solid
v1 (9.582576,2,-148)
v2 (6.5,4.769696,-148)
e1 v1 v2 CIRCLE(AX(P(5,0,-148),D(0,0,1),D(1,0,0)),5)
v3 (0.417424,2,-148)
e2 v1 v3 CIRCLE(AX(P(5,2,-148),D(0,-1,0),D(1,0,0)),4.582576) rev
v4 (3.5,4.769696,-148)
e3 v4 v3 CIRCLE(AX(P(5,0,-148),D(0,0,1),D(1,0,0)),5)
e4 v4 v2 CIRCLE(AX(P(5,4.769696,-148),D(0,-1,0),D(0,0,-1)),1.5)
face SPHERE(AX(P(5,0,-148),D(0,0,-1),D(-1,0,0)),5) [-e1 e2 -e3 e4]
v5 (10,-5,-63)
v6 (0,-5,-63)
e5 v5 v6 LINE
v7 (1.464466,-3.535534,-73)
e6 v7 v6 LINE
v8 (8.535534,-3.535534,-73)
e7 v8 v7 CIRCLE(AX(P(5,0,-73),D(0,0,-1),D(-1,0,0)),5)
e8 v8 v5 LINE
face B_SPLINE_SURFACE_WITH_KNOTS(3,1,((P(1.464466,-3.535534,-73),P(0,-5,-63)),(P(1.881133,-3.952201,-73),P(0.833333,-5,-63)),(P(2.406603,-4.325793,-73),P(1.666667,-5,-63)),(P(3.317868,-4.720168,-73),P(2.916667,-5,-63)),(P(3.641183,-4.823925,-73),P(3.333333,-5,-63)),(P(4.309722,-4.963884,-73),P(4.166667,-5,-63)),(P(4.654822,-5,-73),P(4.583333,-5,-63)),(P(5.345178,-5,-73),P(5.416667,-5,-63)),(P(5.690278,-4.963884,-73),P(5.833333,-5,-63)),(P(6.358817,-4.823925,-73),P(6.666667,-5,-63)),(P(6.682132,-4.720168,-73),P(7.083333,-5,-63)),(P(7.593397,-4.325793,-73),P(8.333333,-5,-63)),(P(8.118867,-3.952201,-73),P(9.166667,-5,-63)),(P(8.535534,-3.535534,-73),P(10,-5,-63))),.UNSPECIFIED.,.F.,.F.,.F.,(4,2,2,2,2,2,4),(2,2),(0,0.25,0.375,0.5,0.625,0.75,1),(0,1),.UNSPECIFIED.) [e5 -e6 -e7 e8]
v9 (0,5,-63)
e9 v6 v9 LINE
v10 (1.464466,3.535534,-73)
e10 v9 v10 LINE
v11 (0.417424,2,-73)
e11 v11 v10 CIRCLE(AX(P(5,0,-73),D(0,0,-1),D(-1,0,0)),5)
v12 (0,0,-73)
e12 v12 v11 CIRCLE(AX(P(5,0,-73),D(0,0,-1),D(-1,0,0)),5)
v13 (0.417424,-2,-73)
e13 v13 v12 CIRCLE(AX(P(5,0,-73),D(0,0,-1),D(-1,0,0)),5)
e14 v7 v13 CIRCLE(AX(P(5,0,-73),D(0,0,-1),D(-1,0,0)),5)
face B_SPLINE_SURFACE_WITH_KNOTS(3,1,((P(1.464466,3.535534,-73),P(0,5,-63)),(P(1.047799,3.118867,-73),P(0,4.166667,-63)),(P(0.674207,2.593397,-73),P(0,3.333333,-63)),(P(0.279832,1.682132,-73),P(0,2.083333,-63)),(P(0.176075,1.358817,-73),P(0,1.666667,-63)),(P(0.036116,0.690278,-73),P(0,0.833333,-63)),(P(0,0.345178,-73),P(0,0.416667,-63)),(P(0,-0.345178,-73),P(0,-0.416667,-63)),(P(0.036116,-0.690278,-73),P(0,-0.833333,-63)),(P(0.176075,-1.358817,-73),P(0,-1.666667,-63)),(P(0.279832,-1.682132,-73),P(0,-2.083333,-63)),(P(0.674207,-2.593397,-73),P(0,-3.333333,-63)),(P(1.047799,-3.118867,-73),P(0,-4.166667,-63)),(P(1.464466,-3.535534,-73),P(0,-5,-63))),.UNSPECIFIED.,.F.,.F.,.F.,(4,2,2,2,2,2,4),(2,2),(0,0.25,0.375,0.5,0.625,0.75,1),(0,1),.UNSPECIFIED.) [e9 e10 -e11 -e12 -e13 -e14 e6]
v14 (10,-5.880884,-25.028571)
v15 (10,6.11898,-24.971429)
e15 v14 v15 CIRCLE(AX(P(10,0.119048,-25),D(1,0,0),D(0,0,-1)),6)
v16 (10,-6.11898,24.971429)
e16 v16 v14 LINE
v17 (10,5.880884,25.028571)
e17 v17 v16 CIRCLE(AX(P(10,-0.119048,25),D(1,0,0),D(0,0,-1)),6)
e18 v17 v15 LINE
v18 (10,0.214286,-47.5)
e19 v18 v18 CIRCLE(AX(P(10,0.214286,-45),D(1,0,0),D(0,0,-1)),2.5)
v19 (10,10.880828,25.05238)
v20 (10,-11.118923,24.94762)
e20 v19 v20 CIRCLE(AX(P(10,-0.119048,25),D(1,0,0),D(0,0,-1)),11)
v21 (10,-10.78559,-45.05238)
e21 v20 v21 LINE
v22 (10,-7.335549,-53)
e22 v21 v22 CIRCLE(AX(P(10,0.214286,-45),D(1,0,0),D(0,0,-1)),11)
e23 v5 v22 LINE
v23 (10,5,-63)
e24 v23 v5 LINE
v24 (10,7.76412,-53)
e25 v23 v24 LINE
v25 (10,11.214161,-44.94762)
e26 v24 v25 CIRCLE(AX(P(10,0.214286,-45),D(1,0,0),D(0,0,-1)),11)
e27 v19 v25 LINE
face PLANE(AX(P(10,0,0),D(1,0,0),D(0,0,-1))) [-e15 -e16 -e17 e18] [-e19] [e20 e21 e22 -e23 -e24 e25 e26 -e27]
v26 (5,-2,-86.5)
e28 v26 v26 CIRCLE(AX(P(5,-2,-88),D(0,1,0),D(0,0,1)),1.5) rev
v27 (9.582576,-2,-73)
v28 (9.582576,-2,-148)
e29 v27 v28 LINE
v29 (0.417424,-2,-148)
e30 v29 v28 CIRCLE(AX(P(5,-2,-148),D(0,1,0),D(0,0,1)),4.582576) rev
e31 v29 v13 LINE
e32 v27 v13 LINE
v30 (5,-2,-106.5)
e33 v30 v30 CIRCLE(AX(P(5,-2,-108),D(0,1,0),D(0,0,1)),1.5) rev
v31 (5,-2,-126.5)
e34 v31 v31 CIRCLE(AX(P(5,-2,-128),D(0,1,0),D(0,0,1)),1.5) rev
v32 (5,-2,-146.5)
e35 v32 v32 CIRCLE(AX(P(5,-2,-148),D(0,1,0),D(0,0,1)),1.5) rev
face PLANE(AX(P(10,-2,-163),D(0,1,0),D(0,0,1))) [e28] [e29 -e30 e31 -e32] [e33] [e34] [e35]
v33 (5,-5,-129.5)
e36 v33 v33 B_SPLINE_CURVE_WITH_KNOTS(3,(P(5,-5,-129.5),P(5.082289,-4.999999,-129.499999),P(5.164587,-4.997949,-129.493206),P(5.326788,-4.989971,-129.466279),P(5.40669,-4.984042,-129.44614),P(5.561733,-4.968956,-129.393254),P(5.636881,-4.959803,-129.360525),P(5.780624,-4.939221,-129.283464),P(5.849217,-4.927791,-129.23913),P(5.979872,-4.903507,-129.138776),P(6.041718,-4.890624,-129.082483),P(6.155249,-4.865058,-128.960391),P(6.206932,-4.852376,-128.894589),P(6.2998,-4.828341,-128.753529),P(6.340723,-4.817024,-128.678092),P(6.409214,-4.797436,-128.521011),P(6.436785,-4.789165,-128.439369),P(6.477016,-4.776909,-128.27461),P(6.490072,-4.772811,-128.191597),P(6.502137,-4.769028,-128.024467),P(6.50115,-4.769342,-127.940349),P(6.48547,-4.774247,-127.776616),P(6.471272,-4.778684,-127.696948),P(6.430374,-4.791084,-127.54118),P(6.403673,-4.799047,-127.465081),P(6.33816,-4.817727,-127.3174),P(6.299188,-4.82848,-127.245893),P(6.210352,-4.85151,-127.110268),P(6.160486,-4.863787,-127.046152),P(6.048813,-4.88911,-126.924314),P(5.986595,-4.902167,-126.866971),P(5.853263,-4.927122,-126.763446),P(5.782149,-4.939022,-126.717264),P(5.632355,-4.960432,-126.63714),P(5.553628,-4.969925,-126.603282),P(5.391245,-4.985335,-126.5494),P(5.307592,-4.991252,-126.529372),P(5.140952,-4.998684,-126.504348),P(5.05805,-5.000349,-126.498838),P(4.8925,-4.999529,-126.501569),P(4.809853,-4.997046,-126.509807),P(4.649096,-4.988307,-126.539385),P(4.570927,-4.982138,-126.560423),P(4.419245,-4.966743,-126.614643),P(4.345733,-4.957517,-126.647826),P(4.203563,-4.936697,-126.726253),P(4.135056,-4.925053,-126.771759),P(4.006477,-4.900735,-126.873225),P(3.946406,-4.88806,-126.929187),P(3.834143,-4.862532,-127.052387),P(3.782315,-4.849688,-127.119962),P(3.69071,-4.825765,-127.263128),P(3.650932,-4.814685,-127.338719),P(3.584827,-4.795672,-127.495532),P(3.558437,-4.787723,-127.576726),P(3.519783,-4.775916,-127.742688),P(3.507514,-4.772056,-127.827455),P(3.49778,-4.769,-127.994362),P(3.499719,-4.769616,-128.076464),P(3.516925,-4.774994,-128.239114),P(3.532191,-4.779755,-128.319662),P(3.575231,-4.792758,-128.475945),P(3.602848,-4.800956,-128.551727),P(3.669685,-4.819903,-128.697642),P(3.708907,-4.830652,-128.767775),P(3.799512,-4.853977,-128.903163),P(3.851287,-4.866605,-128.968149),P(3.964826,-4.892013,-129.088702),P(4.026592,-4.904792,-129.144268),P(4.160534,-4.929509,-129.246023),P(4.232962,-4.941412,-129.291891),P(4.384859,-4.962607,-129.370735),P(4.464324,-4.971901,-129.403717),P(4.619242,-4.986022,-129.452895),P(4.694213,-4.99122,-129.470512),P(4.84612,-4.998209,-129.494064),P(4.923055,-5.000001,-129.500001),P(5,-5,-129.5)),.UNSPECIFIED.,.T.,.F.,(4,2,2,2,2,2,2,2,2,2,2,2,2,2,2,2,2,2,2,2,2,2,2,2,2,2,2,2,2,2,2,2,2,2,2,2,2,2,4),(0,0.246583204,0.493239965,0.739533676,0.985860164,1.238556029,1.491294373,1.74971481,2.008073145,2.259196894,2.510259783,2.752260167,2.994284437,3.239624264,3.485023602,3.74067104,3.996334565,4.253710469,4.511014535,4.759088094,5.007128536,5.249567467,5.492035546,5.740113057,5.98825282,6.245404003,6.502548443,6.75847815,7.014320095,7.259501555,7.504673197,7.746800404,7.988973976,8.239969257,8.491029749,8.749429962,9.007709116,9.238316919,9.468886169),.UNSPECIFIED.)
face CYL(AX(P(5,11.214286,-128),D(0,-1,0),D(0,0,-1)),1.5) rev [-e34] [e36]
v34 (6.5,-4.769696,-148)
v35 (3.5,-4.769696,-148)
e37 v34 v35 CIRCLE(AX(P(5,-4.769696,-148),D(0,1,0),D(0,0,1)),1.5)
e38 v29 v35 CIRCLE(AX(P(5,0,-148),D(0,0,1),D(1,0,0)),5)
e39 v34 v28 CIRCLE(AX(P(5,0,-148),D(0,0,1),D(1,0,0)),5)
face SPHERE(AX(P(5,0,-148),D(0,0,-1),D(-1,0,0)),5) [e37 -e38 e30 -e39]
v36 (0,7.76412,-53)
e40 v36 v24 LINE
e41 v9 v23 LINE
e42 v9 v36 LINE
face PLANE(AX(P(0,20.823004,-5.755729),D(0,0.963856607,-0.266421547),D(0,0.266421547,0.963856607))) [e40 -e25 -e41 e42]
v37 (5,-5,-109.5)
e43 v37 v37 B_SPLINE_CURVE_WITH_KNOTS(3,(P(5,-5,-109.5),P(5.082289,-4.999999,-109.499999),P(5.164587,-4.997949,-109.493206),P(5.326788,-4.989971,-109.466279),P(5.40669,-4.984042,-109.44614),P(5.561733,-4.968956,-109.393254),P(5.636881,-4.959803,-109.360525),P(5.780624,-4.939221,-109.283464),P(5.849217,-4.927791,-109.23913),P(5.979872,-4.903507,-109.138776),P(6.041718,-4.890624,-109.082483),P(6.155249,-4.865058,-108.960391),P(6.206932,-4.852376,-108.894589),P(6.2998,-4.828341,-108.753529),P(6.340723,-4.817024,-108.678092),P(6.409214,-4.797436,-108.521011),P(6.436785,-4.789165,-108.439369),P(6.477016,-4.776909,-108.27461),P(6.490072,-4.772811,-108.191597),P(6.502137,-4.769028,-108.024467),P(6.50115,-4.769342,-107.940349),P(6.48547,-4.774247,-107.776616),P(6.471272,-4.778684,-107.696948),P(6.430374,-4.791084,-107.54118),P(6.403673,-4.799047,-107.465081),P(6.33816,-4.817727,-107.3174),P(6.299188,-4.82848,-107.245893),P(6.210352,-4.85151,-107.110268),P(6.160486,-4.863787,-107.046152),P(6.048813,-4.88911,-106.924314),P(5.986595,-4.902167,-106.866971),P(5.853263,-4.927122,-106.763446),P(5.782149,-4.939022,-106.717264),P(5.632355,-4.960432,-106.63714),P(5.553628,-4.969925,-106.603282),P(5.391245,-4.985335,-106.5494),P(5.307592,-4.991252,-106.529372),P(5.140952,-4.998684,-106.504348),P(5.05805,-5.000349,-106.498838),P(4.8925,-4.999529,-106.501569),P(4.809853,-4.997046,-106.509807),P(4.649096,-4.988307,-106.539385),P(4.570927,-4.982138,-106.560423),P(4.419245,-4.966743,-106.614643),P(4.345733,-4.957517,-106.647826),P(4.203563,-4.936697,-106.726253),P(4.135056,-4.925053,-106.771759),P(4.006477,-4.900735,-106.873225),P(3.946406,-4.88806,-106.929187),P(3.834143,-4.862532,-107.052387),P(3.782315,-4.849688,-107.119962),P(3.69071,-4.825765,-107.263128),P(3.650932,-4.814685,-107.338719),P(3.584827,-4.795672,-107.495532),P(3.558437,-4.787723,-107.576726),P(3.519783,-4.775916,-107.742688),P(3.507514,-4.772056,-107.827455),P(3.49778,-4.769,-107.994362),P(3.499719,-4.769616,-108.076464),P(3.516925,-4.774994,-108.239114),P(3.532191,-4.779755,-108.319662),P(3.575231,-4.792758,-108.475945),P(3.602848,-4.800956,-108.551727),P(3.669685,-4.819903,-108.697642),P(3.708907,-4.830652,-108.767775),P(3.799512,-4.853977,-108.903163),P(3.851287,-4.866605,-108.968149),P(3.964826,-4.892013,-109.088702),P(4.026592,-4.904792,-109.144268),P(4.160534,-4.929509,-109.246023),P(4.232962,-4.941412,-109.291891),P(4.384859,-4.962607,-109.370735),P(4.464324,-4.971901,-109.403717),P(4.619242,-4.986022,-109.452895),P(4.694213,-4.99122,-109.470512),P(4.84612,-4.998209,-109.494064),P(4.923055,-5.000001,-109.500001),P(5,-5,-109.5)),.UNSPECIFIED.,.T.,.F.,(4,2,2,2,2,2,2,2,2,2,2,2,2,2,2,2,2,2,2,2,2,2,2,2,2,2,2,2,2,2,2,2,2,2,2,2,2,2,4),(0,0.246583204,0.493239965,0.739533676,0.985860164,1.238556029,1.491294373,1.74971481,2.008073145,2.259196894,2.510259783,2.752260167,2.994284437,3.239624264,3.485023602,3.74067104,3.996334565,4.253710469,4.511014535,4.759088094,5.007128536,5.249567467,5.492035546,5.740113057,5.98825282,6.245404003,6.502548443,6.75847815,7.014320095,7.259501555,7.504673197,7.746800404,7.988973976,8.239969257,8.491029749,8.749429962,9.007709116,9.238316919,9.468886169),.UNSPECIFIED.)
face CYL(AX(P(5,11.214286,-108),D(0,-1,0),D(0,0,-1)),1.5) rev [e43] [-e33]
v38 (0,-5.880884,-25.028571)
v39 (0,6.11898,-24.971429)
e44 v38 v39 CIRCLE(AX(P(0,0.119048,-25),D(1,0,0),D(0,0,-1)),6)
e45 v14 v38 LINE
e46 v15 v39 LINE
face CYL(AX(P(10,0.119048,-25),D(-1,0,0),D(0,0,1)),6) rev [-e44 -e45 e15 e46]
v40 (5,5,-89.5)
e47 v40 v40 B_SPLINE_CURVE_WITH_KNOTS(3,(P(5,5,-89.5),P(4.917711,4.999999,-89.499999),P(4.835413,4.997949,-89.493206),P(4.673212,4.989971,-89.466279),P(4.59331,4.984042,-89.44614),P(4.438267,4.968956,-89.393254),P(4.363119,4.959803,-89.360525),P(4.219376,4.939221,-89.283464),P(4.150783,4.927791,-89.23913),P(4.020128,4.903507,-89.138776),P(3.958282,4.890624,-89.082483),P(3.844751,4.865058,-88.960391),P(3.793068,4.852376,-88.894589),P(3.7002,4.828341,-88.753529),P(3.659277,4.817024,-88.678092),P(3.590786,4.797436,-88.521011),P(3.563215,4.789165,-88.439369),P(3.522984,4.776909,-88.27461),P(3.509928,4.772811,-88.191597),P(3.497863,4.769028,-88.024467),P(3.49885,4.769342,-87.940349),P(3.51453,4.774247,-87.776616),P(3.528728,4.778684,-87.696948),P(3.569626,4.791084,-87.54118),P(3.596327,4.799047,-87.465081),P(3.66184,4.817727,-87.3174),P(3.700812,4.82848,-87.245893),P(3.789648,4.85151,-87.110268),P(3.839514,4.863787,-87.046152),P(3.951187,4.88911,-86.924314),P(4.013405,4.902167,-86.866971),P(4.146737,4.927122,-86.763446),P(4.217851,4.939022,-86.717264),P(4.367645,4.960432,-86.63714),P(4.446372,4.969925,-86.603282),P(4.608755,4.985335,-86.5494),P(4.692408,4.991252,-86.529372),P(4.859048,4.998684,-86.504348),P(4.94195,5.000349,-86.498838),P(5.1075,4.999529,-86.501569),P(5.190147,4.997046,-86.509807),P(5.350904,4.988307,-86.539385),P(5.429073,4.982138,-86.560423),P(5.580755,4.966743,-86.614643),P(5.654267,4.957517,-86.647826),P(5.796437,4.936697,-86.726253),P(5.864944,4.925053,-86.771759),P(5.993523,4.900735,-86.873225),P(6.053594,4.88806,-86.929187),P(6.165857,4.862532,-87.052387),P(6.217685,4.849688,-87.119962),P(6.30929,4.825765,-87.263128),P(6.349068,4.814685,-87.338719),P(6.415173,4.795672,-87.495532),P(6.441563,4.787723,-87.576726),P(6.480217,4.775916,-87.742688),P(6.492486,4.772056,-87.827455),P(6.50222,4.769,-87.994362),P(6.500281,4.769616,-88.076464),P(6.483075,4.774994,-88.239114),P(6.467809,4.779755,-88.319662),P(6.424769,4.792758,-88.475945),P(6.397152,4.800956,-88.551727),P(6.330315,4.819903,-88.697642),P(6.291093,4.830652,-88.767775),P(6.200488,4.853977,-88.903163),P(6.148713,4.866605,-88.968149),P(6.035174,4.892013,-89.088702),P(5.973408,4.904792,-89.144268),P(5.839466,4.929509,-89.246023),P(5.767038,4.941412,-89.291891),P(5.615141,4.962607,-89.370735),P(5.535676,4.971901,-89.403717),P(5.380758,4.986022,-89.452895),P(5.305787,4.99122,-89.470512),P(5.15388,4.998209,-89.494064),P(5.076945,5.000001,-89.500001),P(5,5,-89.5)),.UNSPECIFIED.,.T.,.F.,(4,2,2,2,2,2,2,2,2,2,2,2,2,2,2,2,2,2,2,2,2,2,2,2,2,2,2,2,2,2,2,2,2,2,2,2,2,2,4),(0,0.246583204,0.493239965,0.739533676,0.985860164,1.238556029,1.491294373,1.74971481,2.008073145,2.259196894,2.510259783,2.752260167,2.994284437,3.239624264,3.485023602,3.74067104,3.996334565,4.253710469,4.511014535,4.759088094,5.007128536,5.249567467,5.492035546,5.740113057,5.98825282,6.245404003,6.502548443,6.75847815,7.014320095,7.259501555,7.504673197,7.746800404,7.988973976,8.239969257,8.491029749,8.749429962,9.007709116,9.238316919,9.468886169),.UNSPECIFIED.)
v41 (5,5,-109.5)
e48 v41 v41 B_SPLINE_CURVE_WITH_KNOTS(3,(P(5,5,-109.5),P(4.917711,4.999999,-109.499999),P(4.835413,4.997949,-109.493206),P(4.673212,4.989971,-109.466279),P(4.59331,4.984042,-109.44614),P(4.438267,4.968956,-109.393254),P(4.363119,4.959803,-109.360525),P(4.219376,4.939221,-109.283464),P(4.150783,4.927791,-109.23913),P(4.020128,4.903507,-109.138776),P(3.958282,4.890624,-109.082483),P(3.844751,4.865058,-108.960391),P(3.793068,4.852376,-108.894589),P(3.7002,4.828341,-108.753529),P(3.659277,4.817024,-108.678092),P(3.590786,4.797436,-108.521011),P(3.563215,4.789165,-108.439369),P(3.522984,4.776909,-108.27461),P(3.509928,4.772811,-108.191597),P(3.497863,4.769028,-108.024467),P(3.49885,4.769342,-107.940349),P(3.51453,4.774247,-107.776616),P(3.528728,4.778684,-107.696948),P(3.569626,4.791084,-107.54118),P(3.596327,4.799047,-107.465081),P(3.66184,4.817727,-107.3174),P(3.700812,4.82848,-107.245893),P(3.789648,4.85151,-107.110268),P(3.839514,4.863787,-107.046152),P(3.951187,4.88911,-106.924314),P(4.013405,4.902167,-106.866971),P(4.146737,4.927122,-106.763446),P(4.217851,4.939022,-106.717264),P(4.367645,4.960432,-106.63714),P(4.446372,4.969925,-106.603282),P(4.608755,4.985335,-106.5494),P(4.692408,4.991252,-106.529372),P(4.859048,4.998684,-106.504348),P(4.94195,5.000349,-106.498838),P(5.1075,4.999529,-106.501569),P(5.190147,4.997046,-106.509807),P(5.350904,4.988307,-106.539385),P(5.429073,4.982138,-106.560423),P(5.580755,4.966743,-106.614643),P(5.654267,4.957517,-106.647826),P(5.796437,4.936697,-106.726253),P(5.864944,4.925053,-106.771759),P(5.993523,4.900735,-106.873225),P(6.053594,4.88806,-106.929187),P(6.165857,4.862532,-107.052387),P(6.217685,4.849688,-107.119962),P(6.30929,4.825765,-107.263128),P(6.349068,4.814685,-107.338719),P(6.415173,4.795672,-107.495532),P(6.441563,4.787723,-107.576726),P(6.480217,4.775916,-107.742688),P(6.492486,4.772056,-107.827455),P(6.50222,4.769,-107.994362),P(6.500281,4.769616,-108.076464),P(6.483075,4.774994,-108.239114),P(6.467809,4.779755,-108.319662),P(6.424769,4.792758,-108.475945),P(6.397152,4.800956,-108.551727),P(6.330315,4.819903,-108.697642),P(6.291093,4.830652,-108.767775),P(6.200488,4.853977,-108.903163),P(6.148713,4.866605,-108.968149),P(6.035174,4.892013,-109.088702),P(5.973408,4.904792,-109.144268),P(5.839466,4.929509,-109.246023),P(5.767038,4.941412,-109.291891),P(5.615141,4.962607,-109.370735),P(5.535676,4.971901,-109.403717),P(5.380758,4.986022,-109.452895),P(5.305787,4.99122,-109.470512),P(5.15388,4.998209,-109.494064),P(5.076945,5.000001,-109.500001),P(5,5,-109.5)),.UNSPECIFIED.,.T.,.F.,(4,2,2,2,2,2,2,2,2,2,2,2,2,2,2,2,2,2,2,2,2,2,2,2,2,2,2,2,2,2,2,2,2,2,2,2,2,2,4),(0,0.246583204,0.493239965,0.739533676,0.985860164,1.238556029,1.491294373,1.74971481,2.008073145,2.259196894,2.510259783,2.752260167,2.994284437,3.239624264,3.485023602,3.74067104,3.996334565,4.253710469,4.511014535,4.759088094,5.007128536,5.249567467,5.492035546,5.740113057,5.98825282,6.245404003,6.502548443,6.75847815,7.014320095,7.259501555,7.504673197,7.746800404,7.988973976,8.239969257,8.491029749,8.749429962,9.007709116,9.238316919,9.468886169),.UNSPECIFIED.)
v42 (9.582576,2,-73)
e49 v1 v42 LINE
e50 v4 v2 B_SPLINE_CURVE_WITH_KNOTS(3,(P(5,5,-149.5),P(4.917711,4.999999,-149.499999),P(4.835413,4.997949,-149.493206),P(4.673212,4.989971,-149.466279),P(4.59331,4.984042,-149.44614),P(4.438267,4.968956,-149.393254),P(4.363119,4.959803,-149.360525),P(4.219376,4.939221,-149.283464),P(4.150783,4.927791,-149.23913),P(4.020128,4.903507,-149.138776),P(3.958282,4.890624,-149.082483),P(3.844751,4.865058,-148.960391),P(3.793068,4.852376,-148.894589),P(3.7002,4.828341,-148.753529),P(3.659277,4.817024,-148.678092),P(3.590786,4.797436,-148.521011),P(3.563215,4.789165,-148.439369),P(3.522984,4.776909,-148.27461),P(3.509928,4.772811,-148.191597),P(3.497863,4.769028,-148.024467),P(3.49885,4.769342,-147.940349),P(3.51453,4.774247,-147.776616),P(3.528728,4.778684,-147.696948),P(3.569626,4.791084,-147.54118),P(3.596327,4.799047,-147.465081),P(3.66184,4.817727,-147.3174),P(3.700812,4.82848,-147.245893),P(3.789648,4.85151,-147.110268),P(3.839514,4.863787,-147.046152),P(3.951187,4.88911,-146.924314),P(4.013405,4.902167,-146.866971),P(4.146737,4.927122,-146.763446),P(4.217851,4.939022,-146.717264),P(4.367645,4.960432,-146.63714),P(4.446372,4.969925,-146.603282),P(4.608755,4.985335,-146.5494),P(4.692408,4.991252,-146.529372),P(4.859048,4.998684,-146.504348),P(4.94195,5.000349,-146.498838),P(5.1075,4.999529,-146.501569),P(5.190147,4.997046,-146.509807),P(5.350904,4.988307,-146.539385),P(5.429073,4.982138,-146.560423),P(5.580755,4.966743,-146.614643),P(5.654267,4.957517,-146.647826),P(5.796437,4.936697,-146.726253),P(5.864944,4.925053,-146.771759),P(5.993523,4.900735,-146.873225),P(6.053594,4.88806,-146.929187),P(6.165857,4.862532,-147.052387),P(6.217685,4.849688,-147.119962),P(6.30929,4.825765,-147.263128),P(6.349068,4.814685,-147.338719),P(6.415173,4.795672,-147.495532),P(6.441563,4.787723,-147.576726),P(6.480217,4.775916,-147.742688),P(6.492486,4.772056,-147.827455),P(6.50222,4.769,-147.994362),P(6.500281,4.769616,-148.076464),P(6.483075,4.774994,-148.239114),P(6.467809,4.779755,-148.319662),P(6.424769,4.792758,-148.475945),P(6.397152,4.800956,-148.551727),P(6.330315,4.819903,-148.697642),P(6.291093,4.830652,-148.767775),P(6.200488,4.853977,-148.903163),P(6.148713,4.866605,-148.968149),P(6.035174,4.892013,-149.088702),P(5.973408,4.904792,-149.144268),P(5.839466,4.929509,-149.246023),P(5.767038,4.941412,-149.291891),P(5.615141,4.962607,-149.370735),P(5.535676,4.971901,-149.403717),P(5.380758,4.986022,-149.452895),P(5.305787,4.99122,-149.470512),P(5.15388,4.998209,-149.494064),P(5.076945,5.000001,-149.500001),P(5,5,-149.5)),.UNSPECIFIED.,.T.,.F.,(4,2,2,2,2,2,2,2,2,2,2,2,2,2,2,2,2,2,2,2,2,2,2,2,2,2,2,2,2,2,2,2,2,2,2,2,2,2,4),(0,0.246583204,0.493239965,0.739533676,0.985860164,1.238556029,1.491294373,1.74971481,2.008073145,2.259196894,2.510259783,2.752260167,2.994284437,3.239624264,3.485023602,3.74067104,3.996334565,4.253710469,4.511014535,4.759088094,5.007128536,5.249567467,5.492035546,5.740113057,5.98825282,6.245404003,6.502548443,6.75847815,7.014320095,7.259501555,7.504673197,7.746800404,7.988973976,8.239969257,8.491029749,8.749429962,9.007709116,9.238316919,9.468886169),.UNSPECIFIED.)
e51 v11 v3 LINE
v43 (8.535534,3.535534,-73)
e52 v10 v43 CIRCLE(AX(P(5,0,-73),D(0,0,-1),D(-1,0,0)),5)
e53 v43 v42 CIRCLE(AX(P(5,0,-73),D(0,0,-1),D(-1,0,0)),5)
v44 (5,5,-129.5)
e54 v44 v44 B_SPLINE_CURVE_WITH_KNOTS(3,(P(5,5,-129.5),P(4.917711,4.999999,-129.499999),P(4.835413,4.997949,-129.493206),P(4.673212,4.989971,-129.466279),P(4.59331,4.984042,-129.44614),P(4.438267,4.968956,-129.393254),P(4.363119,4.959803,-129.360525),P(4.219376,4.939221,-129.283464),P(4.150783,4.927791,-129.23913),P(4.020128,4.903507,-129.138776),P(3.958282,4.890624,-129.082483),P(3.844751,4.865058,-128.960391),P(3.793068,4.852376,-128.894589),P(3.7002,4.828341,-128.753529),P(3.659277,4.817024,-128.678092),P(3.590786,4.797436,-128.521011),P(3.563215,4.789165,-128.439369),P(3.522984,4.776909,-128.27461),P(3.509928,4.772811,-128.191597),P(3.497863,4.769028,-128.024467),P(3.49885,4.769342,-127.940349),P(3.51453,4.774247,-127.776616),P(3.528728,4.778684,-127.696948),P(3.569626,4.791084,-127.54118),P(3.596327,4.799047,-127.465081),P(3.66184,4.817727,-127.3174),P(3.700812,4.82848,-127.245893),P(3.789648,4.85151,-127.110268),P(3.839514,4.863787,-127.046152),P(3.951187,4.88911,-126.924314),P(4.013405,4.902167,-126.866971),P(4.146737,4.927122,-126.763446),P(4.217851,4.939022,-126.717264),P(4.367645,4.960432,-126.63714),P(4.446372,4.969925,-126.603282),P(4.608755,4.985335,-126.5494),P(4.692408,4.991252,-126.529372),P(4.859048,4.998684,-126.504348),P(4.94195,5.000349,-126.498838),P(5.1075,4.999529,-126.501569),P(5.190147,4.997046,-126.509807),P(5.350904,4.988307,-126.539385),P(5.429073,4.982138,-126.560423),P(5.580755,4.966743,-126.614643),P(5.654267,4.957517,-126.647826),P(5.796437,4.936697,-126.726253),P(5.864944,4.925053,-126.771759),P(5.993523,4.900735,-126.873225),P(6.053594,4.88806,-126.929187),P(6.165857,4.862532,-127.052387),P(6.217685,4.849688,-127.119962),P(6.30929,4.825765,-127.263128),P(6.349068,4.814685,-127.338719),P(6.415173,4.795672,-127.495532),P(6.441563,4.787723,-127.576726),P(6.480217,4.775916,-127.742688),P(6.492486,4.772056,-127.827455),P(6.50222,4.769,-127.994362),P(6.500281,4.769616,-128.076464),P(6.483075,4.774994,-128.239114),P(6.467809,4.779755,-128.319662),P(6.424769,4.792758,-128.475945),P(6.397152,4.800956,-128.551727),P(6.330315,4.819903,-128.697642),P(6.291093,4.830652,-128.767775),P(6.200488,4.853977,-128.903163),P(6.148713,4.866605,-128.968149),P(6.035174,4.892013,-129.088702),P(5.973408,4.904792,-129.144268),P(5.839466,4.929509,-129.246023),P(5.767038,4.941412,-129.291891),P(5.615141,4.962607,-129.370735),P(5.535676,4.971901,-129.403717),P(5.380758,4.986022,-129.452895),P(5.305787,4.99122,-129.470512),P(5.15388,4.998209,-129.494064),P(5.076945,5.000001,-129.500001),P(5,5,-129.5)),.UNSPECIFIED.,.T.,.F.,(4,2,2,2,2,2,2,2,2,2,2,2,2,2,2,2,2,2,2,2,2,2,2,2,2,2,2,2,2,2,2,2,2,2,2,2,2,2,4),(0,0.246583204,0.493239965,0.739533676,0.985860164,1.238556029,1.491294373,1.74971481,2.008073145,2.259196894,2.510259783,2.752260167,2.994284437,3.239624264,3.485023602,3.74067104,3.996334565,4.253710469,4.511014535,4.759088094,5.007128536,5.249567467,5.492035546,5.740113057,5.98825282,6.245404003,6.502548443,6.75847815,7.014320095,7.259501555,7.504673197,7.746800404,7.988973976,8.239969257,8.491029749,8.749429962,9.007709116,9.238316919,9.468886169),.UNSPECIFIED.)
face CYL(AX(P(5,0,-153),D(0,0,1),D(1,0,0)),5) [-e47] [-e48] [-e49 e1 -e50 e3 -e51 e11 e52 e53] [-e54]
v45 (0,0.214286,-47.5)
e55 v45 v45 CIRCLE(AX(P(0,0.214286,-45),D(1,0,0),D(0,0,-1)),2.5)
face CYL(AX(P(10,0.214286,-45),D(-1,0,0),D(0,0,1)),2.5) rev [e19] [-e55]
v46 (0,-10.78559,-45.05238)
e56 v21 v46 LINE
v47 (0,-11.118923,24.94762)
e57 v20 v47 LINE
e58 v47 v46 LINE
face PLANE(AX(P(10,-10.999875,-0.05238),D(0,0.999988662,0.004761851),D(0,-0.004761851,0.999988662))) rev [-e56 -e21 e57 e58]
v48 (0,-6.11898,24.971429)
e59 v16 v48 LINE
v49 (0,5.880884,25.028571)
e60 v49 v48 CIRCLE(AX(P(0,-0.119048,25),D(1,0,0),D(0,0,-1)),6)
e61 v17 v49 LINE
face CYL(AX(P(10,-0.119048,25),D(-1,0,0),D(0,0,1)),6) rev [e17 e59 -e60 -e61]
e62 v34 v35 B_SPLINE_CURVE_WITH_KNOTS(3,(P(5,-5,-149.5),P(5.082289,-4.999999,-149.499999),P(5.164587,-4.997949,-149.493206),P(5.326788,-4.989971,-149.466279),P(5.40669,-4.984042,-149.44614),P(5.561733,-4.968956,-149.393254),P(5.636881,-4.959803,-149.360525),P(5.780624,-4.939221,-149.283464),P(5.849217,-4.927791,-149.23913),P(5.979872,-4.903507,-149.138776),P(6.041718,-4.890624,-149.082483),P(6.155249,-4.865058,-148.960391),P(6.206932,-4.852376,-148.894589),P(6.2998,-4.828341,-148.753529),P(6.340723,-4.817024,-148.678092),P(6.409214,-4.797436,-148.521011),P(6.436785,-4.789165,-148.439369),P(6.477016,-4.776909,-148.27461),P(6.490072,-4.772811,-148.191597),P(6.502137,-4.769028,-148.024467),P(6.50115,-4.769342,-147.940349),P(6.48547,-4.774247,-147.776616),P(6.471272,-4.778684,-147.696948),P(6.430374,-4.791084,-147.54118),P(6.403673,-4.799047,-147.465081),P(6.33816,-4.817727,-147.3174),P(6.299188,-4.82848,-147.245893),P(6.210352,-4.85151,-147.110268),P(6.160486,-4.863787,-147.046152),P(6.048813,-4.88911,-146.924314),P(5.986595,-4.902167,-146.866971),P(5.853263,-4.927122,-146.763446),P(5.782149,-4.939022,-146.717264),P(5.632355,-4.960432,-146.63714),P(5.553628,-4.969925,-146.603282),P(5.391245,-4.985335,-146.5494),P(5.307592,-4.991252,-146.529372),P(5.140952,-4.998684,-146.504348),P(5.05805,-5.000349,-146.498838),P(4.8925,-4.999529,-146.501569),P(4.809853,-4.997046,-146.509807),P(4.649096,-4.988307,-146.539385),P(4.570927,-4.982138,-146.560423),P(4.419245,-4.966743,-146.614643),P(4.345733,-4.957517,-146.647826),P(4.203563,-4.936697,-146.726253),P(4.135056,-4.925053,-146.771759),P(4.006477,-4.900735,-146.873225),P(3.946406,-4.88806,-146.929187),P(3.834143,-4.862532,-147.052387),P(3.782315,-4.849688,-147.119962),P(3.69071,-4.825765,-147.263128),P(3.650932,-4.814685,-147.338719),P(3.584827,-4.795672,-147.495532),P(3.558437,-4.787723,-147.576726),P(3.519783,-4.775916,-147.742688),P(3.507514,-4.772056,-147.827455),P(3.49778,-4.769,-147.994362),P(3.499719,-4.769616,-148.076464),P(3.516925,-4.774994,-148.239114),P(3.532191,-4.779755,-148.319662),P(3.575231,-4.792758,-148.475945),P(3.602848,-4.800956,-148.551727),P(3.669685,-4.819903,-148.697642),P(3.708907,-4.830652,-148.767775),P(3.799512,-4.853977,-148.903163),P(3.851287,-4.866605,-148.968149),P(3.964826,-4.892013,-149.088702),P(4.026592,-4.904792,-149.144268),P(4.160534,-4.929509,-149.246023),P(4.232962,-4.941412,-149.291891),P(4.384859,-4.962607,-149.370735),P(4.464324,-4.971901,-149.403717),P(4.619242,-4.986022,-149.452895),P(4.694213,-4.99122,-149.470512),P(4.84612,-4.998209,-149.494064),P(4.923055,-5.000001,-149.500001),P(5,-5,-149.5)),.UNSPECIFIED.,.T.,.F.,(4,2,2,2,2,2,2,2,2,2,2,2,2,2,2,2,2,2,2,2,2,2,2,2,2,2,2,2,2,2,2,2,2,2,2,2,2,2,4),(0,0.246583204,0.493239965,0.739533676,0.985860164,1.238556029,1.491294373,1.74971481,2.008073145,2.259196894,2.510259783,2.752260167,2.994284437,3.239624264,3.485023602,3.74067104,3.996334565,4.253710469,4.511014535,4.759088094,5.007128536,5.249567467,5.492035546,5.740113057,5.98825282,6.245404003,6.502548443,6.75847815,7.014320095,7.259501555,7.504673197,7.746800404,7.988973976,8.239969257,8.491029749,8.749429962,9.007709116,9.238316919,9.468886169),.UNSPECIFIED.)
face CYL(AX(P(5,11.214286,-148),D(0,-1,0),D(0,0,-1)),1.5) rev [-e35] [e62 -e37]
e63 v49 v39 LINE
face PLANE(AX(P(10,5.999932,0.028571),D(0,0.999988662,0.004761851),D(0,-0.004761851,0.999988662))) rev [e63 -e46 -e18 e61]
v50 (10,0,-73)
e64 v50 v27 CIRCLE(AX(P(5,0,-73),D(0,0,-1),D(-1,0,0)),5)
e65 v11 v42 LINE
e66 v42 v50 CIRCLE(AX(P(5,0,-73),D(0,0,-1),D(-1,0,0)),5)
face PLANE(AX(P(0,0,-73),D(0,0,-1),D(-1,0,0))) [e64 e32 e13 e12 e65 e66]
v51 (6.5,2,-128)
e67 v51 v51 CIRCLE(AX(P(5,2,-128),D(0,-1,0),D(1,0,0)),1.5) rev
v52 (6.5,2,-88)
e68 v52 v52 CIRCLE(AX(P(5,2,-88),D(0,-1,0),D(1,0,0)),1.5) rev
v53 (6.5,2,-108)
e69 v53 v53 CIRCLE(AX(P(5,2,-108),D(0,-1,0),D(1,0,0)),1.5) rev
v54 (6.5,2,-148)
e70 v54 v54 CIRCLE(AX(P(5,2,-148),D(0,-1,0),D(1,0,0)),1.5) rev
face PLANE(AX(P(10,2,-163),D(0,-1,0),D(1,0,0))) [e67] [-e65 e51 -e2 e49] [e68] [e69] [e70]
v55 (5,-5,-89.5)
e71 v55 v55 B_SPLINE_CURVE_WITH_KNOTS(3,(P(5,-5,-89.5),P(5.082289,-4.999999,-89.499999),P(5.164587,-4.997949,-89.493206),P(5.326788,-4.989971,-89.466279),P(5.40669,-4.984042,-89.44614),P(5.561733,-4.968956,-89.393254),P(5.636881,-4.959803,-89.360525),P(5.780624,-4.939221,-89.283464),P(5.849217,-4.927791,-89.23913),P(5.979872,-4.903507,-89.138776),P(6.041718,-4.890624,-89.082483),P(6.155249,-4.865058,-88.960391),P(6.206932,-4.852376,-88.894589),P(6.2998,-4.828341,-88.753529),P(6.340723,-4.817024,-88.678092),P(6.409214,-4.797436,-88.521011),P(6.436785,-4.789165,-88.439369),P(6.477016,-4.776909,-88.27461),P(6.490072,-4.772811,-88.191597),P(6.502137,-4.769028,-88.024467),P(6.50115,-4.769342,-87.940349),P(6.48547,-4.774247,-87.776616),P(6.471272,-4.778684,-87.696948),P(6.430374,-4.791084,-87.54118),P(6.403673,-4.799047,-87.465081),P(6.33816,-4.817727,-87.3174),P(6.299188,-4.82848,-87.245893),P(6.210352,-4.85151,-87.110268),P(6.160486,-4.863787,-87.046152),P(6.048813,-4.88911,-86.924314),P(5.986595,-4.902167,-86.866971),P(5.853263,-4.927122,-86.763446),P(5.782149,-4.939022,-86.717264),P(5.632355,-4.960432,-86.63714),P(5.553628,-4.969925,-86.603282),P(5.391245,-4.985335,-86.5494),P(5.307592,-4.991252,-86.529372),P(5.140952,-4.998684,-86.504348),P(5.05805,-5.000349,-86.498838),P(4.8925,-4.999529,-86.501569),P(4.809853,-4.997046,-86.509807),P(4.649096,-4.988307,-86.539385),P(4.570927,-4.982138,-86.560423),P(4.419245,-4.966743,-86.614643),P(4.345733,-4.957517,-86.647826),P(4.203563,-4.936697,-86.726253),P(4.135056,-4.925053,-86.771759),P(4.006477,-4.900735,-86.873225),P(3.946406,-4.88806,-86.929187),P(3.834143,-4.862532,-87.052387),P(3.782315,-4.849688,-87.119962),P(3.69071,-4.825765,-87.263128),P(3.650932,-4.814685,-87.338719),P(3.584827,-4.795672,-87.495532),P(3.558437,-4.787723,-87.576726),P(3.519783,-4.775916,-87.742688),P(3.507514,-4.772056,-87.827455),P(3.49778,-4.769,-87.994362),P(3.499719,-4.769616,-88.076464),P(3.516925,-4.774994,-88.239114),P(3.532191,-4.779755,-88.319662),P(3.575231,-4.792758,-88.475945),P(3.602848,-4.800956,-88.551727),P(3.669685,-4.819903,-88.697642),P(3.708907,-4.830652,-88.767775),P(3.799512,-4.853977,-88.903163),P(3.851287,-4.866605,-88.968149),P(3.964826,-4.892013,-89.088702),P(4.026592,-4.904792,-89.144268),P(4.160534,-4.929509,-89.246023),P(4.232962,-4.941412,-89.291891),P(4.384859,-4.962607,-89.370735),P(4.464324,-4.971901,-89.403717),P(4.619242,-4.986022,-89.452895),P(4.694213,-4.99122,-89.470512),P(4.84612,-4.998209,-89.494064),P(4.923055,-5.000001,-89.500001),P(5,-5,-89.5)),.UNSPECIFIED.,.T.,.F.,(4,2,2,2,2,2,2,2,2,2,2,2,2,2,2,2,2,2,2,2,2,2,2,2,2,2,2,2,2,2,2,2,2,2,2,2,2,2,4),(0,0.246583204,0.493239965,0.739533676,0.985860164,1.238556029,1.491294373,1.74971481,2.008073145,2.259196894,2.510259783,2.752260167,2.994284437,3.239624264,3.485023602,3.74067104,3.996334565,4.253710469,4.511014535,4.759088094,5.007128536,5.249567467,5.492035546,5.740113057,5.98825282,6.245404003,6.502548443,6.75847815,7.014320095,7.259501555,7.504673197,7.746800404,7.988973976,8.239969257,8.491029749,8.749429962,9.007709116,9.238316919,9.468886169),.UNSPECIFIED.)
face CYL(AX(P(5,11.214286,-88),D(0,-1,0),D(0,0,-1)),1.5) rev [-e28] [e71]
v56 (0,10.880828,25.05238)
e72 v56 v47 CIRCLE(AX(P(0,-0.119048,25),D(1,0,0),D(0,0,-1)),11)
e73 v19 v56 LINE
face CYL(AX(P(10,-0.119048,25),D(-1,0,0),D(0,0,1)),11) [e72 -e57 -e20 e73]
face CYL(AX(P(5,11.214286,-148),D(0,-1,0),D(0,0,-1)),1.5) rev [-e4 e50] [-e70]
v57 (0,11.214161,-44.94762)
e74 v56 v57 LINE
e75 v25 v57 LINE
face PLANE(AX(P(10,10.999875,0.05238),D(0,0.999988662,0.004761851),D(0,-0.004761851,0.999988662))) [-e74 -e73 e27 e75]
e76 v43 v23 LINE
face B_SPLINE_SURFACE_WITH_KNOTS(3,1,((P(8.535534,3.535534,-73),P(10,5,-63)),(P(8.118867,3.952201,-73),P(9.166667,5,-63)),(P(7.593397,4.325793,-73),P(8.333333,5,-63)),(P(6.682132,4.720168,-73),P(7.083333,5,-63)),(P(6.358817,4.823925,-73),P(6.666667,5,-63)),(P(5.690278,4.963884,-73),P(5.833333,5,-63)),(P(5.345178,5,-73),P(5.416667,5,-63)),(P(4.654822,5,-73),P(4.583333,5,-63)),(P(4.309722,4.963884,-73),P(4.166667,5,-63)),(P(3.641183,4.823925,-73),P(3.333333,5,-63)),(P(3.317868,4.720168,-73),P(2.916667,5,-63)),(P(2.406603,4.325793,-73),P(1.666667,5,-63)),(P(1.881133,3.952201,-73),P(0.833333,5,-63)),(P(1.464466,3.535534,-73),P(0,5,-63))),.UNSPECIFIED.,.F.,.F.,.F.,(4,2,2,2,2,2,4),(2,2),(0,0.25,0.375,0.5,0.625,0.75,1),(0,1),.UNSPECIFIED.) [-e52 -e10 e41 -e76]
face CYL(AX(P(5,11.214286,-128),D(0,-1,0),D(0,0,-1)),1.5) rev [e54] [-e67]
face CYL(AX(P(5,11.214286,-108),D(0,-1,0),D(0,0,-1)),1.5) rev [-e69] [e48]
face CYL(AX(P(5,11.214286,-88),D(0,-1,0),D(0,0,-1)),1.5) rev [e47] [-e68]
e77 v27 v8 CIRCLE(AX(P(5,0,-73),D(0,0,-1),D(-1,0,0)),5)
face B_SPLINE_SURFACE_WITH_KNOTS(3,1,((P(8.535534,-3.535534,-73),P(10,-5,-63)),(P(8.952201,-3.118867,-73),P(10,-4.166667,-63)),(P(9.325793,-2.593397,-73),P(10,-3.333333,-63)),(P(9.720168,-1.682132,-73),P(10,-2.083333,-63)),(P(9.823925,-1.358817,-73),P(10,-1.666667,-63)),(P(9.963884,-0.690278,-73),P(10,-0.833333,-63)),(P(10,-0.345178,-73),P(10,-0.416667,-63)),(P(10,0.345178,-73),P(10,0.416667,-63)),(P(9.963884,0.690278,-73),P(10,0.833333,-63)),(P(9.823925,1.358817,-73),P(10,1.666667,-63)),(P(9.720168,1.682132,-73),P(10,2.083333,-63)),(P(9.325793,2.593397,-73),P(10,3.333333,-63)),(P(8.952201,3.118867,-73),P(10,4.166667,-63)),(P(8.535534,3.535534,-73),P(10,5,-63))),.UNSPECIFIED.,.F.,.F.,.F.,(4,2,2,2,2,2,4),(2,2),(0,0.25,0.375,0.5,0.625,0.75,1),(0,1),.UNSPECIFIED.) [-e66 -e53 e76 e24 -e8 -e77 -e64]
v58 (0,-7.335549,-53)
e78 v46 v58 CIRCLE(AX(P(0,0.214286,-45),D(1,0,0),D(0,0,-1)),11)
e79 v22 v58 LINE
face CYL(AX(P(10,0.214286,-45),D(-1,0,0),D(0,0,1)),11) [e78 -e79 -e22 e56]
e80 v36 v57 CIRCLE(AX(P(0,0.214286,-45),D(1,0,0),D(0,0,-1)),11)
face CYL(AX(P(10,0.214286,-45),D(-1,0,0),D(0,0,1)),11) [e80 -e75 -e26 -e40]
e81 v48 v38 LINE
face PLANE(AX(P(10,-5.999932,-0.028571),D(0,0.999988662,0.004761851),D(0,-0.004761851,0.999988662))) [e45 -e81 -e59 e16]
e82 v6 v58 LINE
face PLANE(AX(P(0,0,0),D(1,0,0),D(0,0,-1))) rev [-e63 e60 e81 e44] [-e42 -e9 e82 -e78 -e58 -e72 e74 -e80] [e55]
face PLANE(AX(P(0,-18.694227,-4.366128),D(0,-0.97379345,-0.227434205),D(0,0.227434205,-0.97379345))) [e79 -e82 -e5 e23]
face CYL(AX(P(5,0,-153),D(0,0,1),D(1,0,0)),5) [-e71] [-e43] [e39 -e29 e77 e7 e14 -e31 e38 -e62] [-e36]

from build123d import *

# Parameters (mm, degrees)
SKETCH1_R               = 2.4999999999999947
BOSS_EXTRUDE1_DEPTH     = 10
CUT_EXTRUDE2_DEPTH      = 37.99999999999999
SKETCH8_R               = 4.999999999999999
BOSS_EXTRUDE2_DEPTH     = 79.99999999999999
FILLET1_R               = 5
CUT_EXTRUDE3_DEPTH      = 89.99999999999999
CUT_EXTRUDE4_DEPTH      = 154.3205877044287
CUT_EXTRUDE4_DEPTH_BACK = 154.3205877044287
SKETCH10_R              = 1.5
SKETCH10_R_2            = 1.5000000000000018


with BuildPart() as part:
    # Sketch1 → Boss-Extrude1 (new body)
    with BuildSketch(Plane(origin=(0, 0, 0), x_dir=(0, 0, -1), z_dir=(1, 0, 0))):
        with BuildLine():
            Line((-25.052380358502706, 10.880827666520085), (44.9476196414973, 11.214160999853437))
            ThreePointArc((44.9476196414973, 11.214160999853437), (55.9998752855677, 0.2666660727884313), (45.0523803585027, -10.785589571281967))
            Line((45.0523803585027, -10.785589571281967), (-24.947619641497294, -11.118922904615314))
            ThreePointArc((-24.947619641497294, -11.118922904615314), (-35.99987528556771, -0.1714279775503225), (-25.052380358502706, 10.880827666520085))
        make_face()
        with Locations((45, 0.21428571428572923)):
            Circle(SKETCH1_R, mode=Mode.SUBTRACT)
        with BuildLine():
            Line((-25.028571104637827, 5.8808843548984004), (24.971428895362127, 6.118979592993658))
            ThreePointArc((24.971428895362127, 6.118979592993658), (30.999931973946005, 0.14761872368547516), (25.028571104637816, -5.880884354898377))
            Line((25.028571104637816, -5.880884354898377), (-24.971428895362145, -6.118979592993635))
            ThreePointArc((-24.971428895362145, -6.118979592993635), (-30.99993197394602, -0.14761872368546008), (-25.028571104637827, 5.8808843548984004))
        make_face(mode=Mode.SUBTRACT)
    extrude(amount=BOSS_EXTRUDE1_DEPTH)

    # Sketch3 → Cut-Extrude2 (cut)
    with BuildSketch(Plane(origin=(0, 0, 0), x_dir=(0, 0, -1), z_dir=(1, 0, 0))):
        Polygon((53, 10.001615179604634), (63.49944185012656, 10.001615179604633), (63.49944185012656, -12.997162206386868), (53, -12.997162206386866), align=None)
    extrude(amount=CUT_EXTRUDE2_DEPTH, mode=Mode.SUBTRACT)

    # Sketch5 → section 0 of loft1
    with BuildSketch(Plane(origin=(0, 0, -63), x_dir=(-1, 0, 0), z_dir=(0, 0, -1)), mode=Mode.PRIVATE) as loft1_s0:
        with BuildLine():
            Line((-9.999999999999998, 5), (0, 5))
            Line((0, 5), (0, -5))
            Line((0, -5), (-9.999999999999998, -5))
            Line((-9.999999999999998, -5), (-9.999999999999998, 5))
        make_face()
    # loft up to a face of the part (loft1)
    loft([loft1_s0.sketch, part.faces().sort_by_distance((5, 0.21428571428573592, -53))[0]])

    # Loft3: read off the stored shape, not the designer's step
    # Loft3: loft between two sections, ruled curve by curve
    loft3_from = [
        Edge.make_bspline([(1.464466094, 3.535533906, -73), (1.047799427, 3.118867239, -73), (0.674207019, 2.593397212, -73), (0.279832406, 1.6821315, -73), (0.176075175, 1.358816515, -73), (0.036115533, 0.690278229, -73), (0, 0.345177969, -73), (0, -0.345177969, -73), (0.036115533, -0.690278229, -73), (0.176075175, -1.358816515, -73), (0.279832406, -1.6821315, -73), (0.674207019, -2.593397212, -73), (1.047799427, -3.118867239, -73), (1.464466094, -3.535533906, -73)], [0, 0, 0, 0, 0.25, 0.25, 0.375, 0.375, 0.5, 0.5, 0.625, 0.625, 0.75, 0.75, 1, 1, 1, 1], 3),
        Edge.make_bspline([(1.464466094, -3.535533906, -73), (1.881132761, -3.952200573, -73), (2.406602788, -4.325792981, -73), (3.3178685, -4.720167594, -73), (3.641183485, -4.823924825, -73), (4.309721771, -4.963884467, -73), (4.654822031, -5, -73), (5.345177969, -5, -73), (5.690278229, -4.963884467, -73), (6.358816515, -4.823924825, -73), (6.6821315, -4.720167594, -73), (7.593397212, -4.325792981, -73), (8.118867239, -3.952200573, -73), (8.535533906, -3.535533906, -73)], [0, 0, 0, 0, 0.25, 0.25, 0.375, 0.375, 0.5, 0.5, 0.625, 0.625, 0.75, 0.75, 1, 1, 1, 1], 3),
        Edge.make_bspline([(8.535533906, 3.535533906, -73), (8.118867239, 3.952200573, -73), (7.593397212, 4.325792981, -73), (6.6821315, 4.720167594, -73), (6.358816515, 4.823924825, -73), (5.690278229, 4.963884467, -73), (5.345177969, 5, -73), (4.654822031, 5, -73), (4.309721771, 4.963884467, -73), (3.641183485, 4.823924825, -73), (3.3178685, 4.720167594, -73), (2.406602788, 4.325792981, -73), (1.881132761, 3.952200573, -73), (1.464466094, 3.535533906, -73)], [0, 0, 0, 0, 0.25, 0.25, 0.375, 0.375, 0.5, 0.5, 0.625, 0.625, 0.75, 0.75, 1, 1, 1, 1], 3),
        Edge.make_bspline([(8.535533906, -3.535533906, -73), (8.952200573, -3.118867239, -73), (9.325792981, -2.593397212, -73), (9.720167594, -1.6821315, -73), (9.823924825, -1.358816515, -73), (9.963884467, -0.690278229, -73), (10, -0.345177969, -73), (10, 0.345177969, -73), (9.963884467, 0.690278229, -73), (9.823924825, 1.358816515, -73), (9.720167594, 1.6821315, -73), (9.325792981, 2.593397212, -73), (8.952200573, 3.118867239, -73), (8.535533906, 3.535533906, -73)], [0, 0, 0, 0, 0.25, 0.25, 0.375, 0.375, 0.5, 0.5, 0.625, 0.625, 0.75, 0.75, 1, 1, 1, 1], 3),
    ]
    loft3_to = [
        Edge.make_bspline([(0, 5, -63), (0, 4.166666667, -63), (0, 3.333333333, -63), (0, 2.083333333, -63), (0, 1.666666667, -63), (0, 0.833333333, -63), (0, 0.416666667, -63), (0, -0.416666667, -63), (0, -0.833333333, -63), (0, -1.666666667, -63), (0, -2.083333333, -63), (0, -3.333333333, -63), (0, -4.166666667, -63), (0, -5, -63)], [0, 0, 0, 0, 0.25, 0.25, 0.375, 0.375, 0.5, 0.5, 0.625, 0.625, 0.75, 0.75, 1, 1, 1, 1], 3),
        Edge.make_bspline([(0, -5, -63), (0.833333333, -5, -63), (1.666666667, -5, -63), (2.916666667, -5, -63), (3.333333333, -5, -63), (4.166666667, -5, -63), (4.583333333, -5, -63), (5.416666667, -5, -63), (5.833333333, -5, -63), (6.666666667, -5, -63), (7.083333333, -5, -63), (8.333333333, -5, -63), (9.166666667, -5, -63), (10, -5, -63)], [0, 0, 0, 0, 0.25, 0.25, 0.375, 0.375, 0.5, 0.5, 0.625, 0.625, 0.75, 0.75, 1, 1, 1, 1], 3),
        Edge.make_bspline([(10, 5, -63), (9.166666667, 5, -63), (8.333333333, 5, -63), (7.083333333, 5, -63), (6.666666667, 5, -63), (5.833333333, 5, -63), (5.416666667, 5, -63), (4.583333333, 5, -63), (4.166666667, 5, -63), (3.333333333, 5, -63), (2.916666667, 5, -63), (1.666666667, 5, -63), (0.833333333, 5, -63), (0, 5, -63)], [0, 0, 0, 0, 0.25, 0.25, 0.375, 0.375, 0.5, 0.5, 0.625, 0.625, 0.75, 0.75, 1, 1, 1, 1], 3),
        Edge.make_bspline([(10, -5, -63), (10, -4.166666667, -63), (10, -3.333333333, -63), (10, -2.083333333, -63), (10, -1.666666667, -63), (10, -0.833333333, -63), (10, -0.416666667, -63), (10, 0.416666667, -63), (10, 0.833333333, -63), (10, 1.666666667, -63), (10, 2.083333333, -63), (10, 3.333333333, -63), (10, 4.166666667, -63), (10, 5, -63)], [0, 0, 0, 0, 0.25, 0.25, 0.375, 0.375, 0.5, 0.5, 0.625, 0.625, 0.75, 0.75, 1, 1, 1, 1], 3),
    ]
    loft3 = Solid(Shell([*[Face.make_surface_from_curves(loft3_from[k], loft3_to[k]) for k in range(4)], Face(Wire(loft3_from)), Face(Wire(loft3_to))]))
    add(loft3)

    # Sketch8 → Boss-Extrude2 (add)
    with BuildSketch(Plane(origin=(0, 0, -73), x_dir=(-1, 0, 0), z_dir=(0, 0, -1))):
        with Locations(Location((-4.999999999999999, 0, 0), (0, 0, 135))):
            Circle(SKETCH8_R)
    extrude(amount=BOSS_EXTRUDE2_DEPTH)

    # Fillet1
    fillet1_edges = [part.edges().sort_by_distance(p)[0] for p in [
        (1.4644660940672627, -3.5355339059327378, -153),
    ]]
    fillet(fillet1_edges, radius=FILLET1_R)

    # Sketch9 → Cut-Extrude3 (cut)
    with BuildSketch(Plane(origin=(0, 0, -73), x_dir=(-1, 0, 0), z_dir=(0, 0, -1))):
        Polygon((-10, 1.999999999999994), (-7.2e-16, 2), (5e-16, -2), (-9.999999999999998, -2), align=None)
    extrude(amount=CUT_EXTRUDE3_DEPTH, mode=Mode.SUBTRACT)

    # Sketch10 → Cut-Extrude4 (cut, two sides: drawn at the far end of the back side and taken through both)
    with BuildSketch(Plane(origin=(0, 0, 0), x_dir=(1, 0, 0), z_dir=(0, 1, 0)).offset(-CUT_EXTRUDE4_DEPTH_BACK)):
        with Locations((4.999999999999999, 147.99999999999997)):
            Circle(SKETCH10_R)
        with Locations(Location((5.000000000000005, 127.99999999999997, 0), (0, 0, 90))):
            Circle(SKETCH10_R_2)
        with Locations(Location((5.000000000000004, 107.99999999999997, 0), (0, 0, 90))):
            Circle(SKETCH10_R_2)
        with Locations(Location((5.000000000000007, 87.99999999999997, 0), (0, 0, 90))):
            Circle(SKETCH10_R_2)
    extrude(amount=CUT_EXTRUDE4_DEPTH + CUT_EXTRUDE4_DEPTH_BACK, mode=Mode.SUBTRACT)


solid = part.part
